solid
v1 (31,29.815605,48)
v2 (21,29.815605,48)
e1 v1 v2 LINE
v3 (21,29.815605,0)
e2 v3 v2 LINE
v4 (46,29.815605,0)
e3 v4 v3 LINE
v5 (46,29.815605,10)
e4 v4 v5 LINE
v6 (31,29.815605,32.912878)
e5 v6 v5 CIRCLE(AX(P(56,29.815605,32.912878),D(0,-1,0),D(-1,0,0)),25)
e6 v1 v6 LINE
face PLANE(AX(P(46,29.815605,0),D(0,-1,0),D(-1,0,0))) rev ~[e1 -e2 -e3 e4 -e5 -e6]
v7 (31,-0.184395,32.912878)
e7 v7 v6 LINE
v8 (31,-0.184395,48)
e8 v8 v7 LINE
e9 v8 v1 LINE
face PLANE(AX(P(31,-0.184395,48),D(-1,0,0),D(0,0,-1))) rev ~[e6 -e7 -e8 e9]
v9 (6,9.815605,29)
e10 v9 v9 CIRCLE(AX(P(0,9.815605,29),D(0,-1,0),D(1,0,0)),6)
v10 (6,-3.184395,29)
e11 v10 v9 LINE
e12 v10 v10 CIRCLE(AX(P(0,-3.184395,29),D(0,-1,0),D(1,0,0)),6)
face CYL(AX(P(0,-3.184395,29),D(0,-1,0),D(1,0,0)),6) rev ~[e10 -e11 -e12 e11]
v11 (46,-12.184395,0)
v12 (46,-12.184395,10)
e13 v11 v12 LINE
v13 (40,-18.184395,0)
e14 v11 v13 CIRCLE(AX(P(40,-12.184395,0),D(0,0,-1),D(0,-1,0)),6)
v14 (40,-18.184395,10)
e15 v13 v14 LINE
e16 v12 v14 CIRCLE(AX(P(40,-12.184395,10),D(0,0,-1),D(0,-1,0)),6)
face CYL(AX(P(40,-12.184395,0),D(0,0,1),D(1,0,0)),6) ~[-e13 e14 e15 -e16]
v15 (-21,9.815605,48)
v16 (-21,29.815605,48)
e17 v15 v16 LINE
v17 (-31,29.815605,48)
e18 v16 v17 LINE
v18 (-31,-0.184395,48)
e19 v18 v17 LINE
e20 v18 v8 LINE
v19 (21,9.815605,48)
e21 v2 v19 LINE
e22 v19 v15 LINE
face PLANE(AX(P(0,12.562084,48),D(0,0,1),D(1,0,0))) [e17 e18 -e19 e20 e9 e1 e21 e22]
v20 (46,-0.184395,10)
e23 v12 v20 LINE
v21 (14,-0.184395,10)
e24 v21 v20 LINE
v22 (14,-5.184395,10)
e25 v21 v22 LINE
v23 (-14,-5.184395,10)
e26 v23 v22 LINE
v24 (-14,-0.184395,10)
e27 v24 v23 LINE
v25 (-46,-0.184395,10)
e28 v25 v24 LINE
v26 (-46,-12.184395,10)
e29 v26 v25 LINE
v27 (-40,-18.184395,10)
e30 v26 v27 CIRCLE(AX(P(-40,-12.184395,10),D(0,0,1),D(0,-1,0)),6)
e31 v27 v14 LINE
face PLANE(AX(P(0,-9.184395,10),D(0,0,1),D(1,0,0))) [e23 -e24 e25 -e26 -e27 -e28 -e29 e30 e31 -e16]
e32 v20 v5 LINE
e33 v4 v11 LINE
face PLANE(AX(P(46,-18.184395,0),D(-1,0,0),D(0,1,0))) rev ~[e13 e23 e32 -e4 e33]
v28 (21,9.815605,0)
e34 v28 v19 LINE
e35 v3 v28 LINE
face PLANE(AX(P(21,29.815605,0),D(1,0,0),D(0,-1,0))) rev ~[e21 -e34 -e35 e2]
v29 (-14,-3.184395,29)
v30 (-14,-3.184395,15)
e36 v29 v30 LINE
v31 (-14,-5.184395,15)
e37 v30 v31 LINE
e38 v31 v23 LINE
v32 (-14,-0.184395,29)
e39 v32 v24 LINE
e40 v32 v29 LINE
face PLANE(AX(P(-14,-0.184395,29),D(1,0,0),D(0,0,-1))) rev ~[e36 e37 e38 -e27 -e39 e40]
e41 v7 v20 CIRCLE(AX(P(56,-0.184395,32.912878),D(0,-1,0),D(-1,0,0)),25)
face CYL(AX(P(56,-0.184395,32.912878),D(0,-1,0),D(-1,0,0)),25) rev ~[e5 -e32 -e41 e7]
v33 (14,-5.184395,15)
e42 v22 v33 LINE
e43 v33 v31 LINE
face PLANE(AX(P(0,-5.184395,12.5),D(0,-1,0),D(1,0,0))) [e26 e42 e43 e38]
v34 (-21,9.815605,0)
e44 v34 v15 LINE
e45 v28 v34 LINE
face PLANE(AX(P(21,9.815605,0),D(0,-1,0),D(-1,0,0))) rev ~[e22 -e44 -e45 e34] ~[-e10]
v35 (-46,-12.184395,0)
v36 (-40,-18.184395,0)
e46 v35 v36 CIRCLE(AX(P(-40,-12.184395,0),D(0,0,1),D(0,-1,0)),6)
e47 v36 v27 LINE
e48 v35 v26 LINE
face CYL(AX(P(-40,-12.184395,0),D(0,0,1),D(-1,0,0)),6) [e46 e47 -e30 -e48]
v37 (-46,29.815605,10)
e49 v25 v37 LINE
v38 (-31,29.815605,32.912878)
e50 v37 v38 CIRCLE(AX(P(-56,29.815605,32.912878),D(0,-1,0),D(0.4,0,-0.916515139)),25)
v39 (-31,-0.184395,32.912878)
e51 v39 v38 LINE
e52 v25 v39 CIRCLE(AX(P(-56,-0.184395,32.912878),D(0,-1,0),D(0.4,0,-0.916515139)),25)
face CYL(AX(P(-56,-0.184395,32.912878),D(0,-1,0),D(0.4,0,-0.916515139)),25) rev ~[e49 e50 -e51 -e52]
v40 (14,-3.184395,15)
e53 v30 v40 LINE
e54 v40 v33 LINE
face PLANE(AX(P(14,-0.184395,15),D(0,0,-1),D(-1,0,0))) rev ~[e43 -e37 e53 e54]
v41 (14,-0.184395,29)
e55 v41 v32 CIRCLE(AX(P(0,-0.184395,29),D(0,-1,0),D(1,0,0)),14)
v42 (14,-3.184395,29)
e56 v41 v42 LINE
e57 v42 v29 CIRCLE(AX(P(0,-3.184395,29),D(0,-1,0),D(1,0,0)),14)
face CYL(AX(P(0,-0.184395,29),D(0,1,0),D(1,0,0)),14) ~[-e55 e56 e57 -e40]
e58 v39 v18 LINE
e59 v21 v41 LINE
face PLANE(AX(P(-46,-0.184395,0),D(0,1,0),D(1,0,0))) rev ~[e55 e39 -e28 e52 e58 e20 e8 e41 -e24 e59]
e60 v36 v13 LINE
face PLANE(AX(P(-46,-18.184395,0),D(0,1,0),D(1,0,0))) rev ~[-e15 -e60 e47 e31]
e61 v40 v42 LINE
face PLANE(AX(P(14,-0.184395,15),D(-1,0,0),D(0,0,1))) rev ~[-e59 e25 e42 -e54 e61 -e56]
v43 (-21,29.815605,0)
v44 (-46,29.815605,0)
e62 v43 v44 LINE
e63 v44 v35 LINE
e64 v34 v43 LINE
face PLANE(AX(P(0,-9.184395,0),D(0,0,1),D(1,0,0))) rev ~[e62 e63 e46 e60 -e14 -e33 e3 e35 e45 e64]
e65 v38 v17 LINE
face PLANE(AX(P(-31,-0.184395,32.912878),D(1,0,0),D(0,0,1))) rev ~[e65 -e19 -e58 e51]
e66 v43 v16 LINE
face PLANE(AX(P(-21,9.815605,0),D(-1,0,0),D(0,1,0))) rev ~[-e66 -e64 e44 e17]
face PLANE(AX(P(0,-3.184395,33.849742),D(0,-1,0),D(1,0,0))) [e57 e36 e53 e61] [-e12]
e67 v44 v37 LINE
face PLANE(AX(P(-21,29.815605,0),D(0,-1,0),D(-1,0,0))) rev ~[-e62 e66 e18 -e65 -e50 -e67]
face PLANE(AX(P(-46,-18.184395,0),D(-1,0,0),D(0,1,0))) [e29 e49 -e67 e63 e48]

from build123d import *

# Parameters (mm, degrees)
F1_DEPTH = 48
F0_W     = 92
F0_H     = 18
F2_DEPTH = 10
F4_DEPTH = 63
F6_DEPTH = 5
F7_DEPTH = 3
F8_R     = 6
F9_DEPTH = 55.6
F10_R    = 6


with BuildPart() as f1:
    # F0 (on Top) → F1 (new body)
    with BuildSketch(Plane.XY):
        Polygon((-31, 29.8156050886), (-46, 29.8156050886), (-46, -0.1843949114), (46, -0.1843949114), (46, 29.8156050886), (31, 29.8156050886), (21, 29.8156050886), (21, 9.8156050886), (-21, 9.8156050886), (-21, 29.8156050886), align=None)
    extrude(amount=F1_DEPTH)

    # F0 (on Top) → F2 (join)
    with BuildSketch(Plane.XY):
        with Locations((0, -9.1843949114)):
            Rectangle(F0_W, F0_H)
    extrude(amount=F2_DEPTH)

    # F3 (on face) → F4 (cut)
    with BuildSketch(Plane.XZ.offset(0.1843949114)):
        with BuildLine():
            Line((-31, 32.9128784748), (-31, 48))
            Line((-31, 48), (-36.0656386086, 48))
            ThreePointArc((-36.0656386086, 48), (-32.3002211531, 40.8702953048), (-31, 32.9128784748))
        make_face()
        with BuildLine():
            ThreePointArc((-46, 10), (-35.0834993366, 19.2198145372), (-31, 32.9128784748))
            ThreePointArc((-31, 32.9128784748), (-32.3002211531, 40.8702953048), (-36.0656386086, 48))
            Line((-36.0656386086, 48), (-46, 48))
            Line((-46, 48), (-46, 10))
        make_face()
        with BuildLine():
            Line((36.0656386086, 48), (31, 48))
            Line((31, 48), (31, 32.9128784748))
            ThreePointArc((31, 32.9128784748), (32.3002211531, 40.8702953048), (36.0656386086, 48))
        make_face()
        with BuildLine():
            ThreePointArc((36.0656386086, 48), (32.3002211531, 40.8702953048), (31, 32.9128784748))
            ThreePointArc((31, 32.9128784748), (35.0834993366, 19.2198145372), (46, 10))
            Line((46, 10), (46, 48))
            Line((46, 48), (36.0656386086, 48))
        make_face()
        with BuildLine():
            ThreePointArc((81, 32.9128784748), (63.9574168301, 56.6126573217), (36.0656386086, 48))
            Line((36.0656386086, 48), (46, 48))
            Line((46, 48), (46, 10))
            ThreePointArc((46, 10), (69.6930639376, 11.9963778114), (81, 32.9128784748))
        make_face()
    extrude(amount=-F4_DEPTH, mode=Mode.SUBTRACT)

    # F5 (on face) → F6 (join)
    with BuildSketch(Plane.XZ.offset(0.1843949114)):
        Polygon((14, 15), (0, 15), (-14, 15), (-14, 10), (14, 10), align=None)
    extrude(amount=F6_DEPTH)

    # F5 (on face) → F7 (join)
    with BuildSketch(Plane.XZ.offset(0.1843949114)):
        with BuildLine():
            Line((0, 29), (14, 29))
            ThreePointArc((14, 29), (0, 43), (-14, 29))
            Line((-14, 29), (0, 29))
        make_face()
        with BuildLine():
            ThreePointArc((0, 15), (9.8994949366, 19.1005050634), (14, 29))
            Line((14, 29), (0, 29))
            Line((0, 29), (-14, 29))
            ThreePointArc((-14, 29), (-9.8994949366, 19.1005050634), (0, 15))
        make_face()
        with BuildLine():
            Line((14, 15), (14, 29))
            ThreePointArc((14, 29), (9.8994949366, 19.1005050634), (0, 15))
            Line((0, 15), (14, 15))
        make_face()
        with BuildLine():
            ThreePointArc((0, 15), (-9.8994949366, 19.1005050634), (-14, 29))
            Line((-14, 29), (-14, 15))
            Line((-14, 15), (0, 15))
        make_face()
    extrude(amount=F7_DEPTH)

    # F8 (on face) → F9 (cut)
    with BuildSketch(Plane.XZ.offset(3.1843949114)):
        with Locations((0, 29)):
            Circle(F8_R)
    extrude(amount=-F9_DEPTH, mode=Mode.SUBTRACT)

    # F10
    f10_edges = [f1.edges().sort_by_distance(p)[0] for p in [
        (-46, -18.184395, 5),
        (46, -18.184395, 5),
    ]]
    fillet(f10_edges, radius=F10_R)


solid = f1.part
